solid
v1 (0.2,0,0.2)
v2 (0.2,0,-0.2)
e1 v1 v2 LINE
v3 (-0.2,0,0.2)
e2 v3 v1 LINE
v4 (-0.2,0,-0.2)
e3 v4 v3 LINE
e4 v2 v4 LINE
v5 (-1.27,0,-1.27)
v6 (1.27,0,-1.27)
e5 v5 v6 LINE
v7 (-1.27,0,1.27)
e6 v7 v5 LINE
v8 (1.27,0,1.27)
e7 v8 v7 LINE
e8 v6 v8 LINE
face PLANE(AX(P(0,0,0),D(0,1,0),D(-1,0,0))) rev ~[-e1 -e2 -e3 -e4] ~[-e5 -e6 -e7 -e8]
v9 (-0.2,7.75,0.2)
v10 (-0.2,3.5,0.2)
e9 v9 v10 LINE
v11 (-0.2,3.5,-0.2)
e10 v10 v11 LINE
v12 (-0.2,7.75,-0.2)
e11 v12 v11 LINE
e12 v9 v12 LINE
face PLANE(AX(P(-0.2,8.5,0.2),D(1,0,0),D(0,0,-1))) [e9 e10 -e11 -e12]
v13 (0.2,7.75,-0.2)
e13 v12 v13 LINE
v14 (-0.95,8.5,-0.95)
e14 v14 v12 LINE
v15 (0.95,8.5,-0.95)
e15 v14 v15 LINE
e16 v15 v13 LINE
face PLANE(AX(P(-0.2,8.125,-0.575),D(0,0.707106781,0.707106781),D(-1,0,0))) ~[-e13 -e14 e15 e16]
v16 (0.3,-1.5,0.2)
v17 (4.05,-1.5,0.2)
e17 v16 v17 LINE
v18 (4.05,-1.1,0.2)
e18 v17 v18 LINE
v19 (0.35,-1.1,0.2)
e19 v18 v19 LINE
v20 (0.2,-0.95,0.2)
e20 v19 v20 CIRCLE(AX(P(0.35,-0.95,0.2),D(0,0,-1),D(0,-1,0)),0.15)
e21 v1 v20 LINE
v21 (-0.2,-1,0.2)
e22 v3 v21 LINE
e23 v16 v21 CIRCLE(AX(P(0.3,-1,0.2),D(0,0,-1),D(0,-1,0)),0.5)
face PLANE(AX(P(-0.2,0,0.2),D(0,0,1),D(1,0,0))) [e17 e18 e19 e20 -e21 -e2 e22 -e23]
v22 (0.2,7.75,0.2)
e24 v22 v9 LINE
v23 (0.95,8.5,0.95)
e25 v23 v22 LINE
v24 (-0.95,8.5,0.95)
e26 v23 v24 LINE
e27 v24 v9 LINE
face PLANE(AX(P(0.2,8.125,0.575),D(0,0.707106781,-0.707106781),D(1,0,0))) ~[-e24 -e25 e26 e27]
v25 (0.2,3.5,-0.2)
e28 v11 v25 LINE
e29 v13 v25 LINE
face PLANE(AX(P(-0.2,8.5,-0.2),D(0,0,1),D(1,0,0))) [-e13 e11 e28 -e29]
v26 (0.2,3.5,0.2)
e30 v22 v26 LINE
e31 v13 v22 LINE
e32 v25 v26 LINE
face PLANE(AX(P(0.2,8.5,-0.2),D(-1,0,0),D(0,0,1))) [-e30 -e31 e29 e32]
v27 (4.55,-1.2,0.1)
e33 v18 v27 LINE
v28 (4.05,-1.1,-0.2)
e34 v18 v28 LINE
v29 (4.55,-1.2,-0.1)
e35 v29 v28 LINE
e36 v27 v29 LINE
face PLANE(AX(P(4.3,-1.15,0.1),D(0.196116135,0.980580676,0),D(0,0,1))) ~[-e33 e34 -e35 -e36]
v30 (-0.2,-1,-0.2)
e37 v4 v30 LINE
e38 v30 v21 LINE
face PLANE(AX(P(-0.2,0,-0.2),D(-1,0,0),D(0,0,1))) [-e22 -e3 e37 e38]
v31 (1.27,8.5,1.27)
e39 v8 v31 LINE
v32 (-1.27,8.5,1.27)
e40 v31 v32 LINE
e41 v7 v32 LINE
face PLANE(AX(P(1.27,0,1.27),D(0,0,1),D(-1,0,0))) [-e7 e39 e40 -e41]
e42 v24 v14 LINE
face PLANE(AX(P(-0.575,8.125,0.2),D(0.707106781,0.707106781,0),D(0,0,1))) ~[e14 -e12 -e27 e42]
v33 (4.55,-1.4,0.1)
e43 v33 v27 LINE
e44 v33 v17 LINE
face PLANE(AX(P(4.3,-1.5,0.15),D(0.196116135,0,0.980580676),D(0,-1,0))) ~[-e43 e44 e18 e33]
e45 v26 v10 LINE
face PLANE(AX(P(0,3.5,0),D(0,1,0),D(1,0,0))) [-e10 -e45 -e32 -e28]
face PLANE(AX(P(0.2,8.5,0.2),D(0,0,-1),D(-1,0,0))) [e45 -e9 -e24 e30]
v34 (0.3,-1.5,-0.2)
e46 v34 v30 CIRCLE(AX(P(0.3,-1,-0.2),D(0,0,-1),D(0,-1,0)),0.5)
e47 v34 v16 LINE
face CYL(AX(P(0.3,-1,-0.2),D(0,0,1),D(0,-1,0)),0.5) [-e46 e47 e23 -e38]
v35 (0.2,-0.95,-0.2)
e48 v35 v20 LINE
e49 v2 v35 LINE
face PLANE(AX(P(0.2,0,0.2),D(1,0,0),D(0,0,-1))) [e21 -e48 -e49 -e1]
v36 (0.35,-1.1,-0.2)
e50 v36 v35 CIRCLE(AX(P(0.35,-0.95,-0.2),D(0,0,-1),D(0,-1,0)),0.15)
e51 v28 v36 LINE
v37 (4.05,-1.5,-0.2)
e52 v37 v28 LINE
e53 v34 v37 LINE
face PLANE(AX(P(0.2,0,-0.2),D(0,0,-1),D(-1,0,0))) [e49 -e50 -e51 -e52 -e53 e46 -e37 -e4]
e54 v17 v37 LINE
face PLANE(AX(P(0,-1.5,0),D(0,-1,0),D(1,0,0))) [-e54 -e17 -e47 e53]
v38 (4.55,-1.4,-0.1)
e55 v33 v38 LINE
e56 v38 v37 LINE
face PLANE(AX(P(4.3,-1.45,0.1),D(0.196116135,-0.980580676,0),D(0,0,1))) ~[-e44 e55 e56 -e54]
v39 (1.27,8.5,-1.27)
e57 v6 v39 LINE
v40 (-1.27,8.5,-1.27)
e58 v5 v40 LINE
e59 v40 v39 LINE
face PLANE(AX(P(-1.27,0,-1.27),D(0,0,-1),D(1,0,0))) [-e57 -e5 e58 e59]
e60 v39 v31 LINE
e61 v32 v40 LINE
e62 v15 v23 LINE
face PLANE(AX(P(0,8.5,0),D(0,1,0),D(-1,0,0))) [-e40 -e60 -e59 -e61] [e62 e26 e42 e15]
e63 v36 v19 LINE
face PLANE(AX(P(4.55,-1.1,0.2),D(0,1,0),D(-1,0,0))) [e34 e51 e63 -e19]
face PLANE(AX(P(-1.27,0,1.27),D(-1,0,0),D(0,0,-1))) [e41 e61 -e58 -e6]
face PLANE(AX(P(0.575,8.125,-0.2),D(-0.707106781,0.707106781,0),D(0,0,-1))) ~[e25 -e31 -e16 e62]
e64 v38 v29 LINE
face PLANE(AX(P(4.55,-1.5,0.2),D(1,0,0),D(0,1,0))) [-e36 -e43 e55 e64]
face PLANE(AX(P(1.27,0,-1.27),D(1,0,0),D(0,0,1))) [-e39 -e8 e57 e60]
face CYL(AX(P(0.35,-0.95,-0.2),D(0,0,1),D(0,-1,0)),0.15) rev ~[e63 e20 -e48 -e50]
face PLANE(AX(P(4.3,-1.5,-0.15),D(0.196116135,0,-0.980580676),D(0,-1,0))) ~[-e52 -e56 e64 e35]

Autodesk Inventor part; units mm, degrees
ref_plane "YZ Plane" through (0, 0, 0) normal (1, 0, 0) x (0, 1, 0)
ref_plane "XZ Plane" through (0, 0, 0) normal (0, 1, 0) x (-1, 0, 0)
ref_plane "XY Plane" through (0, 0, 0) normal (0, 0, 1) x (1, 0, 0)
sketch "Sketch1" plane through (0, 0, 0) normal (0, 1, 0) x (-1, 0, 0)
  line L0 (-1.27, 1.27) -> (1.27, 1.27)
  line L1 (1.27, 1.27) -> (1.27, -1.27)
  line L2 (1.27, -1.27) -> (-1.27, -1.27)
  line L3 (-1.27, -1.27) -> (-1.27, 1.27)
  line L4 (-1.27, 1.27) -> (1.27, -1.27) construction
  line L5 (1.27, 1.27) -> (-1.27, -1.27) construction
  point P0 (0, 0)
  dimension "d0" = 2.54
  dimension "d1" = 2.54
extrude "Extrusion1" add sketch "Sketch1" along normal blind 8.5
sketch "Sketch2" plane through (0, 8.5, 0) normal (0, 1, 0) x (1, 0, 0)
  line L0 (0.2, -0.2) -> (-0.2, -0.2)
  line L1 (-0.2, -0.2) -> (-0.2, 0.2)
  line L2 (-0.2, 0.2) -> (0.2, 0.2)
  line L3 (0.2, 0.2) -> (0.2, -0.2)
  line L4 (0.2, -0.2) -> (-0.2, 0.2) construction
  line L5 (-0.2, -0.2) -> (0.2, 0.2) construction
  point P0 (0, 0)
  dimension "d4" = 0.4
  dimension "d5" = 0.4
extrude "Extrusion2" cut sketch "Sketch2" against normal blind 5
chamfer "Chamfer1" distance 0.75 angle 45 4 edges at (0, 8.5, 0.2) (-0.2, 8.5, 0) (0, 8.5, -0.2) (0.2, 8.5, 0)
sketch "Sketch3" plane through (0, 0, 0) normal (0, -1, 0) x (1, 0, 0)
  line L0 (-0.2, 0.2) -> (0.2, 0.2)
  line L1 (0.2, 0.2) -> (0.2, -0.2)
  line L2 (0.2, -0.2) -> (-0.2, -0.2)
  line L3 (-0.2, -0.2) -> (-0.2, 0.2)
  line L4 (-0.2, 0.2) -> (0.2, -0.2) construction
  line L5 (0.2, 0.2) -> (-0.2, -0.2) construction
  point P0 (0, 0)
  dimension "d11" = 0.4
  dimension "d12" = 0.4
extrude "Extrusion3" add sketch "Sketch3" along normal blind 1.5
sketch "Sketch4" plane through (-0.2, 0, 0.2) normal (0, 0, 1) x (1, 0, 0)
  line L0 (0, -1.5) -> (4.75, -1.5)
  line L1 (4.75, -1.5) -> (4.75, -1.1)
  line L2 (4.75, -1.1) -> (0, -1.1)
  line L3 (0, -1.1) -> (0, -1.5)
  point P0 (0.2, 0)
  dimension "d27" = 0.4
  dimension "d28" = 4.75
extrude "Extrusion4" add sketch "Sketch4" against normal up to surface (0.4 mm away)
fillet "Fillet1" radius 0.5 1 edges at (-0.2, -1.5, 0)
fillet "Fillet2" radius 0.15 1 edges at (0.2, -1.1, 0)
chamfer "Chamfer6" distance 0.5 distance2 0.1 1 edges at (4.55, -1.3, 0.2) measured on face at (1.7333, -1.3667, 0.2)
chamfer "Chamfer7" distance 0.5 distance2 0.1 1 edges at (4.55, -1.1, -0.05) measured on face at (2.9833, -1.1, -0.0667)
chamfer "Chamfer8" distance 0.1 distance2 0.5 1 edges at (4.55, -1.35, -0.2) measured on face at (4.55, -1.4, 0)
chamfer "Chamfer9" distance 0.1 distance2 0.5 1 edges at (4.55, -1.5, 0) measured on face at (4.55, -1.4, 0.0333)
properties part number "FemaleHederPin_90"
